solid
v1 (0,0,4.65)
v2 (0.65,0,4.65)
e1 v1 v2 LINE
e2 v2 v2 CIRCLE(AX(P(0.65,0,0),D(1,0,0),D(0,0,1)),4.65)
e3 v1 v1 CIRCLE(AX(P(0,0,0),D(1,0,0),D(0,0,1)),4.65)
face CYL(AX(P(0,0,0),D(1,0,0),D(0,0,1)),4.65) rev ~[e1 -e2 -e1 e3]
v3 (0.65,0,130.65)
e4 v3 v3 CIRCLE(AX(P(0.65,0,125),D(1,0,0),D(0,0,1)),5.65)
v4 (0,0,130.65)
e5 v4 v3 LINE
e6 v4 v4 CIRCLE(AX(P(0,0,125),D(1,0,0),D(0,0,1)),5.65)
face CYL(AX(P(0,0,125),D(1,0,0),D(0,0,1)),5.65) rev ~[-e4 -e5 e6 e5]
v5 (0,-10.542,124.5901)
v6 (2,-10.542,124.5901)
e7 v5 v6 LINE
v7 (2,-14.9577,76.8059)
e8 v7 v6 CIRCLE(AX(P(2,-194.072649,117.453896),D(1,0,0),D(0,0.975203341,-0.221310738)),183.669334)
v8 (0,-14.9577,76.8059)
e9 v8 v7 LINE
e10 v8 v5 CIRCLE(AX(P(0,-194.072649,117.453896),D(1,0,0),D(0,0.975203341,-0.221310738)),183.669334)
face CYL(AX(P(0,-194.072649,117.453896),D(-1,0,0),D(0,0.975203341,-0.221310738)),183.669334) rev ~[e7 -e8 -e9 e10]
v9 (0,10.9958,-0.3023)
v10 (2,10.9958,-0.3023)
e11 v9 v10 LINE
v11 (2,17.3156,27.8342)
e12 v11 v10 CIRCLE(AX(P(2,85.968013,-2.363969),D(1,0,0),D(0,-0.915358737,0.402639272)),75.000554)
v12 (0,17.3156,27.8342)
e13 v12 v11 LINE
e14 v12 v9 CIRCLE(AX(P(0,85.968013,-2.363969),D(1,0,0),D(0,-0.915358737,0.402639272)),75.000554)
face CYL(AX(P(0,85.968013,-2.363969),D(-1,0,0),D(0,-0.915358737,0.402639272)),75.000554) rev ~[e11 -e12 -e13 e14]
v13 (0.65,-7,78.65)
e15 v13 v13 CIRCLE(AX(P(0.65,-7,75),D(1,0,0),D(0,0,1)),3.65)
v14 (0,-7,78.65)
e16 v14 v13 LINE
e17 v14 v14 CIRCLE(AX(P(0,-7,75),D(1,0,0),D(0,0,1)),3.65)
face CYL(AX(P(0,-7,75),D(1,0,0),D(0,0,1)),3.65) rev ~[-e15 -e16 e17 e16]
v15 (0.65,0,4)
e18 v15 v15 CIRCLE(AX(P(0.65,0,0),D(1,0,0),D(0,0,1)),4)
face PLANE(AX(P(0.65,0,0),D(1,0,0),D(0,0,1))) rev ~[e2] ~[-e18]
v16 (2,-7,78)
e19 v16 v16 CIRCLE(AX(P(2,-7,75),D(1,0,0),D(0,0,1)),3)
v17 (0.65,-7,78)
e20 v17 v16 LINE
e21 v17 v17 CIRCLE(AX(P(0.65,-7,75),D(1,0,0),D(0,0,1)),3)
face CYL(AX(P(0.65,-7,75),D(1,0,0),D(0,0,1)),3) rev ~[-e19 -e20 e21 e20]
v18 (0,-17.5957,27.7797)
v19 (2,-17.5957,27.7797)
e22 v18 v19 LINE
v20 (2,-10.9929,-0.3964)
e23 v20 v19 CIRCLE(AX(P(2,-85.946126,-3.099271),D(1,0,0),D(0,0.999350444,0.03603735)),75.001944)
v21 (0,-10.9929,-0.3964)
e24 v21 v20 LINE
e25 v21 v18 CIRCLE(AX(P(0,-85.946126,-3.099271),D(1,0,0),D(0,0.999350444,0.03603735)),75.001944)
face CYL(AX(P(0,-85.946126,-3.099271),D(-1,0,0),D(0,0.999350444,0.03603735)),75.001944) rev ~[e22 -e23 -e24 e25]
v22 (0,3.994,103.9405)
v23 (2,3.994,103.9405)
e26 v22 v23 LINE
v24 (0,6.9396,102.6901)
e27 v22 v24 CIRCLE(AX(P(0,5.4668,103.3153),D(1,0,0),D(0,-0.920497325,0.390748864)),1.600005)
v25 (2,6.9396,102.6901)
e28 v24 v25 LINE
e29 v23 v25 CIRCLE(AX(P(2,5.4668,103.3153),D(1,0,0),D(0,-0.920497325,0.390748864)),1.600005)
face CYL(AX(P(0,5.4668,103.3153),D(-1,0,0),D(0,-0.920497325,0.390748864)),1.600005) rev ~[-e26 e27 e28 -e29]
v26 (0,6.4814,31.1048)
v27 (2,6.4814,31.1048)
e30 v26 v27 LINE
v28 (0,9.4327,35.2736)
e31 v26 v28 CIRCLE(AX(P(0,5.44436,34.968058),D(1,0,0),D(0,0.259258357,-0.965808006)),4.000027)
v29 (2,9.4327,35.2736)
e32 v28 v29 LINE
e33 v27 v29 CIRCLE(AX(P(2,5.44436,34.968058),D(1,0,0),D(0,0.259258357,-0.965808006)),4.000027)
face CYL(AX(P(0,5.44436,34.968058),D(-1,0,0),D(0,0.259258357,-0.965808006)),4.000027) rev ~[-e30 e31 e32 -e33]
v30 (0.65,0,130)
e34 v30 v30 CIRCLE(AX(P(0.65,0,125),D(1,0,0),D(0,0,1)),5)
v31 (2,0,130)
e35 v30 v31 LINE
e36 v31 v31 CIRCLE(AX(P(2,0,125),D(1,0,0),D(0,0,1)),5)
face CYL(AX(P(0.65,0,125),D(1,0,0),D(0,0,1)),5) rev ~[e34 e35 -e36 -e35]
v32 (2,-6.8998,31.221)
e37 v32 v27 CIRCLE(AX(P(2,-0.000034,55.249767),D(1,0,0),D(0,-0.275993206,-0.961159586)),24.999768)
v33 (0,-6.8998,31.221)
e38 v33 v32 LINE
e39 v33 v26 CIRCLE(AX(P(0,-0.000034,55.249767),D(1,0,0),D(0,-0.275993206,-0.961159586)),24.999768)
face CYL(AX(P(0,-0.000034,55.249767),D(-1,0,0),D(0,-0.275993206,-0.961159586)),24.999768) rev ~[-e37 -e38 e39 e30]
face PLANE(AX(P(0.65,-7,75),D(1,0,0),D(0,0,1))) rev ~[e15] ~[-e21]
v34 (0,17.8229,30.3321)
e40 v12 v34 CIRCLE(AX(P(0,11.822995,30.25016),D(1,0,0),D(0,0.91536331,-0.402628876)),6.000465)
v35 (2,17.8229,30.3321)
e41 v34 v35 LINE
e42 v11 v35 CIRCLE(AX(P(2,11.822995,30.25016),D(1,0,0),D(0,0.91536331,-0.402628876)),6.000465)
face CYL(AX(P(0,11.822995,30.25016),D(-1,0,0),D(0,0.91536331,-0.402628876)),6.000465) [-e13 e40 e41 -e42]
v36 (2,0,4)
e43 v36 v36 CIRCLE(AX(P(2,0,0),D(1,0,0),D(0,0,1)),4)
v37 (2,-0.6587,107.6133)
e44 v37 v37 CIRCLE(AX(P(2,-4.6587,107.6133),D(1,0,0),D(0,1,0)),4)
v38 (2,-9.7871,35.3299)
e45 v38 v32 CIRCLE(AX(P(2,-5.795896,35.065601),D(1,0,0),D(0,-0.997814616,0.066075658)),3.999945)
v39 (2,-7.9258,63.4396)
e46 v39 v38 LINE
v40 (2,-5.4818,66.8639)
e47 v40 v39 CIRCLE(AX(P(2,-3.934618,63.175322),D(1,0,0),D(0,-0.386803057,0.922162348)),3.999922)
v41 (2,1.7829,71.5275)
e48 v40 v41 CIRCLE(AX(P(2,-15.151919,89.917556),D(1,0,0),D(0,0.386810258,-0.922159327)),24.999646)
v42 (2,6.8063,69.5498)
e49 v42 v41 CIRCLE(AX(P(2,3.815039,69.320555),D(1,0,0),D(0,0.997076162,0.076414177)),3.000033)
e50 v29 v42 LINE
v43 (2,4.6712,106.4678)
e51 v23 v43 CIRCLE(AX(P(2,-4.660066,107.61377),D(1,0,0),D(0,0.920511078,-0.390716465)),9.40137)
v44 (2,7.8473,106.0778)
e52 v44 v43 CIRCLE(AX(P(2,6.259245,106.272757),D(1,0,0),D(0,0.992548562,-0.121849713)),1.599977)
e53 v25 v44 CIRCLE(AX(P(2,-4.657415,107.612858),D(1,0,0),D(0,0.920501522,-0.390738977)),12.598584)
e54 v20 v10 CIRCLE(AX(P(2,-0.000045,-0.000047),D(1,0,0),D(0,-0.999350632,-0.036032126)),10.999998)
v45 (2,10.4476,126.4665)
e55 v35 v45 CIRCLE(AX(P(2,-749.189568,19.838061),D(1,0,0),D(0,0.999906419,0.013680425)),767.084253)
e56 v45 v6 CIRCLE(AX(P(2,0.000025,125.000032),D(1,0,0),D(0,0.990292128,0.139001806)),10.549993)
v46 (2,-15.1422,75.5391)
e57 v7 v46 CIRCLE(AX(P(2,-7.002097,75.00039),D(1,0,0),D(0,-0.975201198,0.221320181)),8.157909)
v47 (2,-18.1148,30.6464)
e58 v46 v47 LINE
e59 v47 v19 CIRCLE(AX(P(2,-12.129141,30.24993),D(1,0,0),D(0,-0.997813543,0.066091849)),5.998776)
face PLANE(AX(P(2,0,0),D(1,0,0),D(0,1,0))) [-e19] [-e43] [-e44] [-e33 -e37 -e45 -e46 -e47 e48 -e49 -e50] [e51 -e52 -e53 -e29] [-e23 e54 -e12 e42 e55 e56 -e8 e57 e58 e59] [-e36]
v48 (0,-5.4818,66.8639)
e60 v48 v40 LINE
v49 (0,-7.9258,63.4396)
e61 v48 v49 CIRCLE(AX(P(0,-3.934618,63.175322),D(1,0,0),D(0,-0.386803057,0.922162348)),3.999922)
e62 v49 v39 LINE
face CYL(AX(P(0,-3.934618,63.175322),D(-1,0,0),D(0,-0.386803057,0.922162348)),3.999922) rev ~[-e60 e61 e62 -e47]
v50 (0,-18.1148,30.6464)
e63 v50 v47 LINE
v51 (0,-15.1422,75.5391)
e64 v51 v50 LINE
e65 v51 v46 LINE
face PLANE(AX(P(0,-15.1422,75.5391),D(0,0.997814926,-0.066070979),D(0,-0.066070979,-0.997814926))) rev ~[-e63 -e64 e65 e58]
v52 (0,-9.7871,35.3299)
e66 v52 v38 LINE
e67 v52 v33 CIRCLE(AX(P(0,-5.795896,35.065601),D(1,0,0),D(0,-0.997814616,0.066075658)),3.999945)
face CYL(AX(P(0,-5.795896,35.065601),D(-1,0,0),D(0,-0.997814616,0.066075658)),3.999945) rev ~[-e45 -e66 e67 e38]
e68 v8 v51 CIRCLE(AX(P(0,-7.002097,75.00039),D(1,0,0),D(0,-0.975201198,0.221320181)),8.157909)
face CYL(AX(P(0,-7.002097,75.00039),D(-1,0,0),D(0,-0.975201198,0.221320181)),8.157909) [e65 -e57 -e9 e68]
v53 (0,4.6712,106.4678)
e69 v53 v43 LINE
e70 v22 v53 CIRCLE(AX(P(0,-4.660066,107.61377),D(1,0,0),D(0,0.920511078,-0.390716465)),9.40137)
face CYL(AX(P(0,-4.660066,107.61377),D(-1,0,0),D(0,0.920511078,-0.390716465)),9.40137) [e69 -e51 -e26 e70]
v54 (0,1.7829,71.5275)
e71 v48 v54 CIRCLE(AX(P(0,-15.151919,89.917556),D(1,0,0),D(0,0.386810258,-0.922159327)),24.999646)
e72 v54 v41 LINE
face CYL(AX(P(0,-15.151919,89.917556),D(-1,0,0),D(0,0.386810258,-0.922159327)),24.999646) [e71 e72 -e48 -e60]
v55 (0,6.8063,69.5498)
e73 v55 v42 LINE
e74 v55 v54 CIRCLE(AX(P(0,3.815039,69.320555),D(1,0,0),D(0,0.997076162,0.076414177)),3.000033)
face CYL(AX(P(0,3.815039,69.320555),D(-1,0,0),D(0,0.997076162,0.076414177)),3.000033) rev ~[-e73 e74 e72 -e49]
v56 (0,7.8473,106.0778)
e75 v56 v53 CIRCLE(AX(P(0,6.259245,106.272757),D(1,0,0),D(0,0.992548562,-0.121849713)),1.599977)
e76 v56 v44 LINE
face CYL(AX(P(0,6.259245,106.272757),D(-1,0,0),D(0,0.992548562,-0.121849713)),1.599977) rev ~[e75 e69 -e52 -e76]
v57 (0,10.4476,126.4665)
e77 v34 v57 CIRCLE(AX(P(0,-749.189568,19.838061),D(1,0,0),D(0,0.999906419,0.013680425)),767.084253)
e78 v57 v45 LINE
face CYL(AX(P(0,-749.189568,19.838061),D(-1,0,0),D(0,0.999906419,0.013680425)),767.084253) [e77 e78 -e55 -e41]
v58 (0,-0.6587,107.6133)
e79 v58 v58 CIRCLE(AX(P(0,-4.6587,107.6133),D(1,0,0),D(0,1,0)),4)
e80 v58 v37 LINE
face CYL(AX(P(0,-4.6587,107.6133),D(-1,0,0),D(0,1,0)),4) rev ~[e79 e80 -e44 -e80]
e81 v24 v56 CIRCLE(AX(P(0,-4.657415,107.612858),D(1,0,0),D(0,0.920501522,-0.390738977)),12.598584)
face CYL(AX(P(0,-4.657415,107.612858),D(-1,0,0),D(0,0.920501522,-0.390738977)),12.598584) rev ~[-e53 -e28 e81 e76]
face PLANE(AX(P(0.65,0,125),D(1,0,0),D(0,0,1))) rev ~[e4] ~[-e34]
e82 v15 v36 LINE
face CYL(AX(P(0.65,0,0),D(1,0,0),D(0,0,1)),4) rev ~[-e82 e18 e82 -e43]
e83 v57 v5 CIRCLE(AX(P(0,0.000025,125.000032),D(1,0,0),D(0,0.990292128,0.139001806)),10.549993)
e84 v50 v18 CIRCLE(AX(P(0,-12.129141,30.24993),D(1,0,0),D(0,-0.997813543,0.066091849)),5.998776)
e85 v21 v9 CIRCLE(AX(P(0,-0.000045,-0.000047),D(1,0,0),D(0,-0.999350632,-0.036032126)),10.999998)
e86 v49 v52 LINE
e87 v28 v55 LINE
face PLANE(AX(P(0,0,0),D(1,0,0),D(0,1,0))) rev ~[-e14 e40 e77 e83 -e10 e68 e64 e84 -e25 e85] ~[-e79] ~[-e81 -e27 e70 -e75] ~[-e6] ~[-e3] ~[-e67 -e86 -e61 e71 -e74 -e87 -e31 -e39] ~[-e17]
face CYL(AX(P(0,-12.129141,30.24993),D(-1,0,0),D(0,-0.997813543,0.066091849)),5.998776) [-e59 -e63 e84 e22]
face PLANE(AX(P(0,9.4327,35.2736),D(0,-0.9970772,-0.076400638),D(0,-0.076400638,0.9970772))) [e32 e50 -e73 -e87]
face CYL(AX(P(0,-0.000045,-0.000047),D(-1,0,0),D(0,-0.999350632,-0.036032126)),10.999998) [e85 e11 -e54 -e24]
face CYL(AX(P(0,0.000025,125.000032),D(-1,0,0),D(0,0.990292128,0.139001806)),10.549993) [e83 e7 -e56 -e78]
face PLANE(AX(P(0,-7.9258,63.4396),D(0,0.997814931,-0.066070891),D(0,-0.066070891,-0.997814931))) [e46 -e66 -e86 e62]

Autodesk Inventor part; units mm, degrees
ref_plane "YZ Plane" through (0, 0, 0) normal (1, 0, 0) x (0, 1, 0)
ref_plane "XZ Plane" through (0, 0, 0) normal (0, 1, 0) x (-1, 0, 0)
ref_plane "XY Plane" through (0, 0, 0) normal (0, 0, 1) x (1, 0, 0)
sketch "スケッチ1" plane through (0, 0, 0) normal (1, 0, 0) x (0, 1, 0)
  line L0 (0, 0) -> (0, 125) construction
  arc A0 (10.4476, 126.4665) -> (-10.542, 124.5901) centre (0, 125) ccw
  arc A1 (9.5221, 125.7296) -> (-7.8176, 119.5148) centre (0, 125) ccw construction
  line L1 (9.5221, 125.7296) -> (19.0442, 1.4592) construction
  line L2 (-7.8176, 119.5148) -> (-1.1797, 110.0544) construction
  arc A2 (-0.7923, 105.8489) -> (-1.1797, 110.0544) centre (-4.6587, 107.6133) ccw construction
  circle A3 centre (-4.6587, 107.6133) radius 4
  arc A4 (-4.5464, 108.0035) -> (-4.7566, 107.2192) centre (5.9664, 104.7663) ccw construction
  circle A5 centre (5.9664, 104.7663) radius 1.6 construction
  arc A6 (17.3156, 27.8342) -> (10.9958, -0.3023) centre (85.9675, -2.3638) ccw
  arc A7 (-10.9929, -0.3964) -> (10.9958, -0.3023) centre (0, 0) ccw
  arc A8 (-10.9929, -0.3964) -> (-17.5957, 27.7797) centre (-85.9441, -3.099) ccw
  line L3 (-15.1422, 75.5391) -> (-18.1148, 30.6464)
  line L4 (5.9664, 104.7663) -> (-4.6587, 107.6133) construction
  arc A9 (-18.742, 3.6807) -> (19.0442, 1.4592) centre (0, 0) ccw construction
  arc A10 (17.3156, 27.8342) -> (17.8229, 30.3321) centre (11.8235, 30.25) ccw
  arc A11 (-18.1148, 30.6464) -> (-17.5957, 27.7797) centre (-12.1279, 30.25) ccw
  line L5 (10.9958, -0.3023) -> (0, 0) construction
  line L6 (0, 0) -> (-10.9929, -0.3964) construction
  line L7 (9.4327, 35.2736) -> (6.8063, 69.5498)
  line L8 (-7.9258, 63.4396) -> (-9.7871, 35.3299)
  arc A12 (-6.8998, 31.221) -> (6.4814, 31.1048) centre (0, 55.25) ccw
  arc A13 (6.4814, 31.1048) -> (9.4327, 35.2736) centre (5.4444, 34.968) ccw
  arc A14 (-9.7871, 35.3299) -> (-6.8998, 31.221) centre (-5.7959, 35.0656) ccw
  arc A15 (-5.4818, 66.8639) -> (-7.9258, 63.4396) centre (-3.9346, 63.1753) ccw
  line L9 (-0.7923, 105.8489) -> (-13.5138, 77.9726) construction
  line L10 (-14.1444, 75.4731) -> (-19.3486, -3.1223) construction
  arc A16 (-13.5138, 77.9726) -> (-14.1444, 75.4731) centre (-7, 75) ccw construction
  arc A17 (-14.9577, 76.8059) -> (-15.1422, 75.5391) centre (-7, 75) ccw
  circle A18 centre (-4.6587, 107.6133) radius 6 construction
  arc A19 (6.9396, 102.6901) -> (7.8473, 106.0778) centre (-4.6587, 107.6133) ccw
  arc A20 (3.994, 103.9405) -> (4.6712, 106.4678) centre (-4.6587, 107.6133) ccw
  arc A21 (7.8473, 106.0778) -> (4.6712, 106.4678) centre (6.2593, 106.2728) ccw
  arc A22 (3.994, 103.9405) -> (6.9396, 102.6901) centre (5.4668, 103.3153) ccw
  line L11 (6.2593, 106.2728) -> (-4.6587, 107.6133) construction
  line L12 (-4.6587, 107.6133) -> (5.4668, 103.3153) construction
  line L13 (11.8235, 30.25) -> (-12.1279, 30.25) construction
  arc A23 (6.8063, 69.5498) -> (1.7829, 71.5275) centre (3.8151, 69.3206) ccw
  arc A24 (-5.4818, 66.8639) -> (1.7829, 71.5275) centre (-15.1521, 89.9179) ccw
  arc A25 (17.8229, 30.3321) -> (10.4476, 126.4665) centre (-749.1865, 19.8382) ccw
  line L14 (12.0148, 125.9206) -> (21.5369, 1.6502) construction
  line L15 (11.4747, 113.335) -> (17.1037, 39.8734) construction
  arc A26 (-14.9577, 76.8059) -> (-10.542, 124.5901) centre (-194.0689, 117.4533) ccw
  line L16 (0, 125) -> (-4.6587, 107.6133) construction
  circle A27 centre (-7, 75) radius 8 construction
  line L17 (3.8151, 69.3206) -> (-3.9346, 63.1753) construction
  line L18 (-7, 75) -> (-0.0598, 66.2479) construction
  point P0 (-14.406, 86.6566)
  point P1 (17.9231, 29.1792)
  point P2 (-14.4228, 86.4034)
  point P3 (-9.9857, 32.3309)
  point P4 (9.6685, 32.1953)
  point P5 (7.074, 66.0557)
  dimension "d2" = 125
  dimension "d10" = 19.1
  dimension "d13" = 8
  dimension "d14" = 0.25
  dimension "d20" = 3.2
  dimension "d25" = 11
  dimension "d75" = 19.1
  dimension "d79" = 1
  dimension "d86" = 6
  dimension "d87" = 75
  dimension "d95" = 8
  dimension "d96" = 4
  dimension "d109" = 1
  dimension "d111" = 75
  dimension "d116" = 12
  dimension "d117" = 11
  dimension "d118" = 16
  dimension "d119" = 30.25
  dimension "d120" = 25
  dimension "d124" = 3
  dimension "d128" = 25
  dimension "d130" = 2.5
  dimension "d131" = 8
  dimension "d132" = 18
  dimension "d133" = 15
  dimension "d134" = 7
  dimension "d135" = 16
  dimension "d136" = 7.16
extrude "押し出し1" add sketch "スケッチ1" along normal blind 2
hole "穴1" at (0, 0, 0) direction (1, 0, 0) diameter 8 end through all counterbore diameter 9.3 counterbore depth 0.65
hole "穴2" at (0, -7, 75) direction (1, 0, 0) diameter 6 end through all counterbore diameter 7.3 counterbore depth 0.65
hole "穴3" at (0, 0, 125) direction (1, 0, 0) diameter 10 end through all counterbore diameter 11.3 counterbore depth 0.65
properties part number "UPPER_LEG_OUTER_FRAME"
